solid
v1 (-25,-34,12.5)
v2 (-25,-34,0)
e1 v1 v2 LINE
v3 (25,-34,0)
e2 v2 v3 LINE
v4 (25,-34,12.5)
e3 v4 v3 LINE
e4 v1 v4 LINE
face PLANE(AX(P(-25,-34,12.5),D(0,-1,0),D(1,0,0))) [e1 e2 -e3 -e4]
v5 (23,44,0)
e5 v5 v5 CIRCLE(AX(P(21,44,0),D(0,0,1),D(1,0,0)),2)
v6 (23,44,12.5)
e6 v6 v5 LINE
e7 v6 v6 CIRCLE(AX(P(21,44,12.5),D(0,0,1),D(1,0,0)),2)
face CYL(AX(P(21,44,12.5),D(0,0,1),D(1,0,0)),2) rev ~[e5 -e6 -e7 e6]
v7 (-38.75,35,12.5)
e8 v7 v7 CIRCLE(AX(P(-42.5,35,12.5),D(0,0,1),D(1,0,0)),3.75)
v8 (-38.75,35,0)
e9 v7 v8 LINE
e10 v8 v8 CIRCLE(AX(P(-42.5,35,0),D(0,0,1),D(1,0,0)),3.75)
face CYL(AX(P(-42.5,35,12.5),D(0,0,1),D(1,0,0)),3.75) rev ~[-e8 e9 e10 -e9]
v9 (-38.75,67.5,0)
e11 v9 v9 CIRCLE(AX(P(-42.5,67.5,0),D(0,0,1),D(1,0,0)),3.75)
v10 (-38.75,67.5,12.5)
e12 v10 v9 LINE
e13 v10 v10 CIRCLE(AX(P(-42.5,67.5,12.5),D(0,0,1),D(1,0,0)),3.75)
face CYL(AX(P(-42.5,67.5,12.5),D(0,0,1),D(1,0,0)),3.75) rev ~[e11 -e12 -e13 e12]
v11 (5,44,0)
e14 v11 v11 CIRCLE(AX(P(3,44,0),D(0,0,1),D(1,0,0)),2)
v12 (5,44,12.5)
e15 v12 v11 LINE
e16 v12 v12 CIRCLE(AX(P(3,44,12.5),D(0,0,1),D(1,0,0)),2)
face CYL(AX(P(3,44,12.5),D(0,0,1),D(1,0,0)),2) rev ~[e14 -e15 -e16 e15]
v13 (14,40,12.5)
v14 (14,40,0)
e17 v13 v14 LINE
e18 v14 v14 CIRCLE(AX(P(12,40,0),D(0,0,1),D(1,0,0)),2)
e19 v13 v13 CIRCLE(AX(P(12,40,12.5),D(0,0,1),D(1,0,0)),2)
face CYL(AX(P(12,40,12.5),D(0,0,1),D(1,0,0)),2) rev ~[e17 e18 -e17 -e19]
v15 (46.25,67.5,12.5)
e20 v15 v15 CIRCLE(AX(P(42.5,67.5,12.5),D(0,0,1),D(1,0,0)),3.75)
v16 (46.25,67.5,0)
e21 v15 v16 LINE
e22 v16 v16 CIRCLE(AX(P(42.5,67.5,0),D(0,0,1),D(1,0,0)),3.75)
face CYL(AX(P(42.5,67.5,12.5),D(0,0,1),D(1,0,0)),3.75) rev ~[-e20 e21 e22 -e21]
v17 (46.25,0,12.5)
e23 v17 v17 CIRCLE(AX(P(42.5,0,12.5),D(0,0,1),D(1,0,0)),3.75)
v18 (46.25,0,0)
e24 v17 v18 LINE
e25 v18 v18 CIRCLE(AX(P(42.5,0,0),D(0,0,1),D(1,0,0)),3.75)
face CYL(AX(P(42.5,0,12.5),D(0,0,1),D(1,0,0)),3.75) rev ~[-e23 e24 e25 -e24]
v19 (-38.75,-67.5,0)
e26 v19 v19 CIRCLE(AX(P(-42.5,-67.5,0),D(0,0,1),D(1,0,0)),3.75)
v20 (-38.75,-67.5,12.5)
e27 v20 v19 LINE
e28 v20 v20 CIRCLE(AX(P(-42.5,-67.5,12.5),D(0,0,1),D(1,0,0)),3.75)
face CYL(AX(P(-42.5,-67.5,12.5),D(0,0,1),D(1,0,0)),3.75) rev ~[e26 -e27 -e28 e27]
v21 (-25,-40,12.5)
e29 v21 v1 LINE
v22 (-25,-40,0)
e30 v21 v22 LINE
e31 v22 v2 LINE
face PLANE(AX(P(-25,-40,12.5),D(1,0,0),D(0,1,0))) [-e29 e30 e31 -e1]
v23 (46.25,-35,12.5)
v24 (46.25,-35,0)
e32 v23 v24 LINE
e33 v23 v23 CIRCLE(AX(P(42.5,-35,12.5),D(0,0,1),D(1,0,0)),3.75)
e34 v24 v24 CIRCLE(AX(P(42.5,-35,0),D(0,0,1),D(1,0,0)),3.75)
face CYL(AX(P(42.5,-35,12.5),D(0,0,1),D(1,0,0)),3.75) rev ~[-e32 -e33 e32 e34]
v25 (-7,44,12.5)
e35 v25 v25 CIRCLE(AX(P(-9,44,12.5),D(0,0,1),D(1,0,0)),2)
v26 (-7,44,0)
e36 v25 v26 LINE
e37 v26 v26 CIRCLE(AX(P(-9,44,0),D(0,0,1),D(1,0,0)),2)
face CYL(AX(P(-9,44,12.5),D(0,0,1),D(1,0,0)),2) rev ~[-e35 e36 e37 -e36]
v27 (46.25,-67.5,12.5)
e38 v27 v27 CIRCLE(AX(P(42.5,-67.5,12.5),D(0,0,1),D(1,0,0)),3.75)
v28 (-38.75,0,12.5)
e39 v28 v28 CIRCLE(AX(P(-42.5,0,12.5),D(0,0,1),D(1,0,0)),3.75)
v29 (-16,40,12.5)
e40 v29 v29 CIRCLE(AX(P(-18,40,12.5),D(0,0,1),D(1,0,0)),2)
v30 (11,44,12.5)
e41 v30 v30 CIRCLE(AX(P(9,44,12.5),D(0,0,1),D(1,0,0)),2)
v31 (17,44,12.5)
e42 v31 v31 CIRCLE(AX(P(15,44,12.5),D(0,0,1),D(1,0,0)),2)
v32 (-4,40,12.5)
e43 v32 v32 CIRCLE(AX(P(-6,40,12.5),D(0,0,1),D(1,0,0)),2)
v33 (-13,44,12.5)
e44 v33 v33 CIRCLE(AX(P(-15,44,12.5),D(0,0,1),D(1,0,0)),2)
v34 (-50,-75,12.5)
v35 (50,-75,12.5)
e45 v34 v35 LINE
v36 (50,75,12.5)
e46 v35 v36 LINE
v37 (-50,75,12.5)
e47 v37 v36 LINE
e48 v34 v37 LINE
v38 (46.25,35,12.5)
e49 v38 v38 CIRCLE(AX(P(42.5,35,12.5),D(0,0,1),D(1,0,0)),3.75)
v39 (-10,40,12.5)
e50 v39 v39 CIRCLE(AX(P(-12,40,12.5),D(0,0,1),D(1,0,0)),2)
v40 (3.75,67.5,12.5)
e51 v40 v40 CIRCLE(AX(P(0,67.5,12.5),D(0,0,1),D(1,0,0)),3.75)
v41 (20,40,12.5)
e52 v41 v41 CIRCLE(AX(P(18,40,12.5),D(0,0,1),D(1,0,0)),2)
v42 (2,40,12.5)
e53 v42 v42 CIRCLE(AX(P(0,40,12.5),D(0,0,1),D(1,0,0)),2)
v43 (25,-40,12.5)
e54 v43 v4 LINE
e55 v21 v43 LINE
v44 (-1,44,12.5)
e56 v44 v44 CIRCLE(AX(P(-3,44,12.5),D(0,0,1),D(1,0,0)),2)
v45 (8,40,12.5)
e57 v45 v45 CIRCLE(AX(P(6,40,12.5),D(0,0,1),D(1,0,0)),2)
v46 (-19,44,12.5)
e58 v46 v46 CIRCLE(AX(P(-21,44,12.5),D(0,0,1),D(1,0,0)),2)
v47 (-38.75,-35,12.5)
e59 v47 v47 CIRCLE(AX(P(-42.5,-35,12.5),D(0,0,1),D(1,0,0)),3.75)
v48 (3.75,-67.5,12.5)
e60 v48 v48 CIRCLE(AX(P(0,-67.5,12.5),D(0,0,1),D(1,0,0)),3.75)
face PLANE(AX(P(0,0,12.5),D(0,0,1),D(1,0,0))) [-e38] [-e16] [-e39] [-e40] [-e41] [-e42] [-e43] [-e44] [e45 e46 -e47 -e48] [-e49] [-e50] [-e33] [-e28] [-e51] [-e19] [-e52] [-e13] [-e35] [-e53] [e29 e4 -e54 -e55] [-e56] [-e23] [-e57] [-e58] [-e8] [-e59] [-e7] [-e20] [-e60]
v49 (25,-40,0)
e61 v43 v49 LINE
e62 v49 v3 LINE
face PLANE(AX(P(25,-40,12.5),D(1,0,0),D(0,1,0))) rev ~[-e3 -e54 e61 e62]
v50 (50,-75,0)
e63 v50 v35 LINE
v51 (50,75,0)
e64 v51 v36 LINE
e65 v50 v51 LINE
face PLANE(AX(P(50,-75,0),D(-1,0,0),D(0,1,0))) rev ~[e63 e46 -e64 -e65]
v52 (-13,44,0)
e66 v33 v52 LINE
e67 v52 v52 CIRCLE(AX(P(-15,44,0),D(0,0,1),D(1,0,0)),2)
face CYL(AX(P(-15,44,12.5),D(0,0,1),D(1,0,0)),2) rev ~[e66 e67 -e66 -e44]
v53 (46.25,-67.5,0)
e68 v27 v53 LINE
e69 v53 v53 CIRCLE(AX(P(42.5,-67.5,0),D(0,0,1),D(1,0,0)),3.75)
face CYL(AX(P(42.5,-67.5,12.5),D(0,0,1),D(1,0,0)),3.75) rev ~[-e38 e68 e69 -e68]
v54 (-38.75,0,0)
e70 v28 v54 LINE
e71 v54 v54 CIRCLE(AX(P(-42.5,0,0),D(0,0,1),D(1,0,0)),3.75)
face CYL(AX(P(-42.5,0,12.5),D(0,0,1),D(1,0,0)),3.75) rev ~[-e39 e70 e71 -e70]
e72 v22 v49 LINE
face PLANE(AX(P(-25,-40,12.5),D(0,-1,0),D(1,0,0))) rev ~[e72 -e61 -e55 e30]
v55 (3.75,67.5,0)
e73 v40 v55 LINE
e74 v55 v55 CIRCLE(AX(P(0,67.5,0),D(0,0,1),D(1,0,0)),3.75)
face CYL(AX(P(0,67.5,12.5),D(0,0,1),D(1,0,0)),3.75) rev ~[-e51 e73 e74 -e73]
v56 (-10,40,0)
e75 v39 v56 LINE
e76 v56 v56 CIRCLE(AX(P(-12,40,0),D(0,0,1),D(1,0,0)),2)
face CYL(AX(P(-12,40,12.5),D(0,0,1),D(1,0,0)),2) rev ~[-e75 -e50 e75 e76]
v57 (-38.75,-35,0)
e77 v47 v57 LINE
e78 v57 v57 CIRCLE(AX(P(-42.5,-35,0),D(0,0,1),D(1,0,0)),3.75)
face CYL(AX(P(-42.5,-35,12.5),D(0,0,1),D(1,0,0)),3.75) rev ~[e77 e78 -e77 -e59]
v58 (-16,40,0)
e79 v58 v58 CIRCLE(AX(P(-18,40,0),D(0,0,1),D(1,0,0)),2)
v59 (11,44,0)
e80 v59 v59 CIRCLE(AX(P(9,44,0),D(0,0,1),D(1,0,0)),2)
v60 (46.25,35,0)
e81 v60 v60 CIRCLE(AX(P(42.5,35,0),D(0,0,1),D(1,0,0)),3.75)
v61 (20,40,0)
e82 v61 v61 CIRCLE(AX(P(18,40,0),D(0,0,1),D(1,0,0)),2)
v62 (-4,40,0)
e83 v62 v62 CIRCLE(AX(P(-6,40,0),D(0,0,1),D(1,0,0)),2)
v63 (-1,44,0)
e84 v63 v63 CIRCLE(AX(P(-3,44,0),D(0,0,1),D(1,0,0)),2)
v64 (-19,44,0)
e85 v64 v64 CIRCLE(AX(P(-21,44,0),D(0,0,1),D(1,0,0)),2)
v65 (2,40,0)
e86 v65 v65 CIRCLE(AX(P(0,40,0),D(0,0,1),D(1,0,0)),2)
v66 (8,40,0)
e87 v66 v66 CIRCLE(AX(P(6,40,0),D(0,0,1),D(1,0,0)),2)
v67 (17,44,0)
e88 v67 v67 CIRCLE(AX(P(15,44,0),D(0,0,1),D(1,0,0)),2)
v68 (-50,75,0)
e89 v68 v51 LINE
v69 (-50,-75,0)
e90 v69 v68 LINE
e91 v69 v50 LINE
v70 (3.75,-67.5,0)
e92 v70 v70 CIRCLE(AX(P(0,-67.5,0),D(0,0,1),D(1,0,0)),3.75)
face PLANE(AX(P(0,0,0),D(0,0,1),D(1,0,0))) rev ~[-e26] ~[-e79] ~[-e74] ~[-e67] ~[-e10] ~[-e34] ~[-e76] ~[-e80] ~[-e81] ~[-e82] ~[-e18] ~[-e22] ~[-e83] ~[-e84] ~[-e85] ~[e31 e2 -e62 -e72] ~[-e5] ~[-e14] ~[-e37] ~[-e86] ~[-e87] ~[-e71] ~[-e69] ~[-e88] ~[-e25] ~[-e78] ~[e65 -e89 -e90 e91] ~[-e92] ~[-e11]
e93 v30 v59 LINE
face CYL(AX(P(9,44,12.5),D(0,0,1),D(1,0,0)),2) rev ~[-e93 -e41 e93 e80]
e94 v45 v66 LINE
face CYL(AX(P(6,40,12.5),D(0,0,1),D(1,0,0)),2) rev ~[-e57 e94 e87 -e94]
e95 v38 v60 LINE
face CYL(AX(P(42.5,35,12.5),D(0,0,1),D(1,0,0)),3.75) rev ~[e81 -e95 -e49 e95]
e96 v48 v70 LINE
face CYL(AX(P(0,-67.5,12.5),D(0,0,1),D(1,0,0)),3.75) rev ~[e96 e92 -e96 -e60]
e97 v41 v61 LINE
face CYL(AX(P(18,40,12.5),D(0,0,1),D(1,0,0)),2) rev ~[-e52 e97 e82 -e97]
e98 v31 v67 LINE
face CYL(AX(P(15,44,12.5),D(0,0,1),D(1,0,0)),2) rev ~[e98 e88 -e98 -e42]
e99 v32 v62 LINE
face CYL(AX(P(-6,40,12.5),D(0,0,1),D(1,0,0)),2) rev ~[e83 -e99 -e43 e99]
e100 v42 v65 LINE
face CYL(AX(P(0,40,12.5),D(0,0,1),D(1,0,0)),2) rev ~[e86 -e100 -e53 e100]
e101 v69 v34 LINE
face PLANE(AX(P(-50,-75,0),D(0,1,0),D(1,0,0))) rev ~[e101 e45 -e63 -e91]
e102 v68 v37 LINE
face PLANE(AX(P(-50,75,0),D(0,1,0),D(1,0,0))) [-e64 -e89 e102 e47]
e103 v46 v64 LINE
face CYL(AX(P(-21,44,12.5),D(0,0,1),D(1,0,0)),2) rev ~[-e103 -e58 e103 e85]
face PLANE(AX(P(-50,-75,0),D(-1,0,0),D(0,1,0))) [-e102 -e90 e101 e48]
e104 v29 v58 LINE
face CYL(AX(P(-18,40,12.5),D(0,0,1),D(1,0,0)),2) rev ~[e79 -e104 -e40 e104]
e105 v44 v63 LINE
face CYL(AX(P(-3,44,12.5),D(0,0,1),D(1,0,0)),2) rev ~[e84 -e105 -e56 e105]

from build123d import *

# Parameters (mm, degrees)
F0_W     = 100
F0_H     = 150
F1_DEPTH = 12.5
F2_R     = 3.75
F3_DEPTH = 25
F4_W     = 50
F4_H     = 6
F5_DEPTH = 25
F6_R     = 2
F7_DEPTH = 25


# Not quite as in the source:
# - a feature names something its author has since deleted; it is built from what else it names


with BuildPart() as f1:
    # F0 (on Top) → F1 (new body)
    with BuildSketch(Plane.XY):
        Rectangle(F0_W, F0_H)
    extrude(amount=F1_DEPTH)

    # F2 (on face) → F3 (cut)
    with BuildSketch(Plane.XY.offset(12.5)):
        with Locations((-42.5, 67.5)):
            Circle(F2_R)
        with Locations((-42.5, 0)):
            Circle(F2_R)
        with Locations((-42.5, -35)):
            Circle(F2_R)
        with Locations((-42.5, -67.5)):
            Circle(F2_R)
        with Locations((0, -67.5)):
            Circle(F2_R)
        with Locations((-42.5, 35)):
            Circle(F2_R)
        with Locations((42.5, -67.5)):
            Circle(F2_R)
        with Locations((42.5, -35)):
            Circle(F2_R)
        with Locations((42.5, 0)):
            Circle(F2_R)
        with Locations((42.5, 35)):
            Circle(F2_R)
        with Locations((42.5, 67.5)):
            Circle(F2_R)
        with Locations((0, 67.5)):
            Circle(F2_R)
    extrude(amount=-F3_DEPTH, mode=Mode.SUBTRACT)

    # F4 (on face) → F5 (cut)
    with BuildSketch(Plane.XY.offset(12.5)):
        with Locations((0, -37)):
            Rectangle(F4_W, F4_H)
    extrude(amount=-F5_DEPTH, mode=Mode.SUBTRACT)

    # F6 (on face) → F7 (cut)
    with BuildSketch(Plane.XY.offset(12.5)):
        with Locations((-18, 40)):
            Circle(F6_R)
        with Locations((-15, 44)):
            Circle(F6_R)
        with Locations((-12, 40)):
            Circle(F6_R)
        with Locations((-9, 44)):
            Circle(F6_R)
        with Locations((-6, 40)):
            Circle(F6_R)
        with Locations((0, 40)):
            Circle(F6_R)
        with Locations((-3, 44)):
            Circle(F6_R)
        with Locations((-21, 44)):
            Circle(F6_R)
        with Locations((15, 44)):
            Circle(F6_R)
        with Locations((6, 40)):
            Circle(F6_R)
        with Locations((18, 40)):
            Circle(F6_R)
        with Locations((3, 44)):
            Circle(F6_R)
        with Locations((21, 44)):
            Circle(F6_R)
        with Locations((12, 40)):
            Circle(F6_R)
        with Locations((9, 44)):
            Circle(F6_R)
    extrude(amount=-F7_DEPTH, mode=Mode.SUBTRACT)


solid = f1.part
